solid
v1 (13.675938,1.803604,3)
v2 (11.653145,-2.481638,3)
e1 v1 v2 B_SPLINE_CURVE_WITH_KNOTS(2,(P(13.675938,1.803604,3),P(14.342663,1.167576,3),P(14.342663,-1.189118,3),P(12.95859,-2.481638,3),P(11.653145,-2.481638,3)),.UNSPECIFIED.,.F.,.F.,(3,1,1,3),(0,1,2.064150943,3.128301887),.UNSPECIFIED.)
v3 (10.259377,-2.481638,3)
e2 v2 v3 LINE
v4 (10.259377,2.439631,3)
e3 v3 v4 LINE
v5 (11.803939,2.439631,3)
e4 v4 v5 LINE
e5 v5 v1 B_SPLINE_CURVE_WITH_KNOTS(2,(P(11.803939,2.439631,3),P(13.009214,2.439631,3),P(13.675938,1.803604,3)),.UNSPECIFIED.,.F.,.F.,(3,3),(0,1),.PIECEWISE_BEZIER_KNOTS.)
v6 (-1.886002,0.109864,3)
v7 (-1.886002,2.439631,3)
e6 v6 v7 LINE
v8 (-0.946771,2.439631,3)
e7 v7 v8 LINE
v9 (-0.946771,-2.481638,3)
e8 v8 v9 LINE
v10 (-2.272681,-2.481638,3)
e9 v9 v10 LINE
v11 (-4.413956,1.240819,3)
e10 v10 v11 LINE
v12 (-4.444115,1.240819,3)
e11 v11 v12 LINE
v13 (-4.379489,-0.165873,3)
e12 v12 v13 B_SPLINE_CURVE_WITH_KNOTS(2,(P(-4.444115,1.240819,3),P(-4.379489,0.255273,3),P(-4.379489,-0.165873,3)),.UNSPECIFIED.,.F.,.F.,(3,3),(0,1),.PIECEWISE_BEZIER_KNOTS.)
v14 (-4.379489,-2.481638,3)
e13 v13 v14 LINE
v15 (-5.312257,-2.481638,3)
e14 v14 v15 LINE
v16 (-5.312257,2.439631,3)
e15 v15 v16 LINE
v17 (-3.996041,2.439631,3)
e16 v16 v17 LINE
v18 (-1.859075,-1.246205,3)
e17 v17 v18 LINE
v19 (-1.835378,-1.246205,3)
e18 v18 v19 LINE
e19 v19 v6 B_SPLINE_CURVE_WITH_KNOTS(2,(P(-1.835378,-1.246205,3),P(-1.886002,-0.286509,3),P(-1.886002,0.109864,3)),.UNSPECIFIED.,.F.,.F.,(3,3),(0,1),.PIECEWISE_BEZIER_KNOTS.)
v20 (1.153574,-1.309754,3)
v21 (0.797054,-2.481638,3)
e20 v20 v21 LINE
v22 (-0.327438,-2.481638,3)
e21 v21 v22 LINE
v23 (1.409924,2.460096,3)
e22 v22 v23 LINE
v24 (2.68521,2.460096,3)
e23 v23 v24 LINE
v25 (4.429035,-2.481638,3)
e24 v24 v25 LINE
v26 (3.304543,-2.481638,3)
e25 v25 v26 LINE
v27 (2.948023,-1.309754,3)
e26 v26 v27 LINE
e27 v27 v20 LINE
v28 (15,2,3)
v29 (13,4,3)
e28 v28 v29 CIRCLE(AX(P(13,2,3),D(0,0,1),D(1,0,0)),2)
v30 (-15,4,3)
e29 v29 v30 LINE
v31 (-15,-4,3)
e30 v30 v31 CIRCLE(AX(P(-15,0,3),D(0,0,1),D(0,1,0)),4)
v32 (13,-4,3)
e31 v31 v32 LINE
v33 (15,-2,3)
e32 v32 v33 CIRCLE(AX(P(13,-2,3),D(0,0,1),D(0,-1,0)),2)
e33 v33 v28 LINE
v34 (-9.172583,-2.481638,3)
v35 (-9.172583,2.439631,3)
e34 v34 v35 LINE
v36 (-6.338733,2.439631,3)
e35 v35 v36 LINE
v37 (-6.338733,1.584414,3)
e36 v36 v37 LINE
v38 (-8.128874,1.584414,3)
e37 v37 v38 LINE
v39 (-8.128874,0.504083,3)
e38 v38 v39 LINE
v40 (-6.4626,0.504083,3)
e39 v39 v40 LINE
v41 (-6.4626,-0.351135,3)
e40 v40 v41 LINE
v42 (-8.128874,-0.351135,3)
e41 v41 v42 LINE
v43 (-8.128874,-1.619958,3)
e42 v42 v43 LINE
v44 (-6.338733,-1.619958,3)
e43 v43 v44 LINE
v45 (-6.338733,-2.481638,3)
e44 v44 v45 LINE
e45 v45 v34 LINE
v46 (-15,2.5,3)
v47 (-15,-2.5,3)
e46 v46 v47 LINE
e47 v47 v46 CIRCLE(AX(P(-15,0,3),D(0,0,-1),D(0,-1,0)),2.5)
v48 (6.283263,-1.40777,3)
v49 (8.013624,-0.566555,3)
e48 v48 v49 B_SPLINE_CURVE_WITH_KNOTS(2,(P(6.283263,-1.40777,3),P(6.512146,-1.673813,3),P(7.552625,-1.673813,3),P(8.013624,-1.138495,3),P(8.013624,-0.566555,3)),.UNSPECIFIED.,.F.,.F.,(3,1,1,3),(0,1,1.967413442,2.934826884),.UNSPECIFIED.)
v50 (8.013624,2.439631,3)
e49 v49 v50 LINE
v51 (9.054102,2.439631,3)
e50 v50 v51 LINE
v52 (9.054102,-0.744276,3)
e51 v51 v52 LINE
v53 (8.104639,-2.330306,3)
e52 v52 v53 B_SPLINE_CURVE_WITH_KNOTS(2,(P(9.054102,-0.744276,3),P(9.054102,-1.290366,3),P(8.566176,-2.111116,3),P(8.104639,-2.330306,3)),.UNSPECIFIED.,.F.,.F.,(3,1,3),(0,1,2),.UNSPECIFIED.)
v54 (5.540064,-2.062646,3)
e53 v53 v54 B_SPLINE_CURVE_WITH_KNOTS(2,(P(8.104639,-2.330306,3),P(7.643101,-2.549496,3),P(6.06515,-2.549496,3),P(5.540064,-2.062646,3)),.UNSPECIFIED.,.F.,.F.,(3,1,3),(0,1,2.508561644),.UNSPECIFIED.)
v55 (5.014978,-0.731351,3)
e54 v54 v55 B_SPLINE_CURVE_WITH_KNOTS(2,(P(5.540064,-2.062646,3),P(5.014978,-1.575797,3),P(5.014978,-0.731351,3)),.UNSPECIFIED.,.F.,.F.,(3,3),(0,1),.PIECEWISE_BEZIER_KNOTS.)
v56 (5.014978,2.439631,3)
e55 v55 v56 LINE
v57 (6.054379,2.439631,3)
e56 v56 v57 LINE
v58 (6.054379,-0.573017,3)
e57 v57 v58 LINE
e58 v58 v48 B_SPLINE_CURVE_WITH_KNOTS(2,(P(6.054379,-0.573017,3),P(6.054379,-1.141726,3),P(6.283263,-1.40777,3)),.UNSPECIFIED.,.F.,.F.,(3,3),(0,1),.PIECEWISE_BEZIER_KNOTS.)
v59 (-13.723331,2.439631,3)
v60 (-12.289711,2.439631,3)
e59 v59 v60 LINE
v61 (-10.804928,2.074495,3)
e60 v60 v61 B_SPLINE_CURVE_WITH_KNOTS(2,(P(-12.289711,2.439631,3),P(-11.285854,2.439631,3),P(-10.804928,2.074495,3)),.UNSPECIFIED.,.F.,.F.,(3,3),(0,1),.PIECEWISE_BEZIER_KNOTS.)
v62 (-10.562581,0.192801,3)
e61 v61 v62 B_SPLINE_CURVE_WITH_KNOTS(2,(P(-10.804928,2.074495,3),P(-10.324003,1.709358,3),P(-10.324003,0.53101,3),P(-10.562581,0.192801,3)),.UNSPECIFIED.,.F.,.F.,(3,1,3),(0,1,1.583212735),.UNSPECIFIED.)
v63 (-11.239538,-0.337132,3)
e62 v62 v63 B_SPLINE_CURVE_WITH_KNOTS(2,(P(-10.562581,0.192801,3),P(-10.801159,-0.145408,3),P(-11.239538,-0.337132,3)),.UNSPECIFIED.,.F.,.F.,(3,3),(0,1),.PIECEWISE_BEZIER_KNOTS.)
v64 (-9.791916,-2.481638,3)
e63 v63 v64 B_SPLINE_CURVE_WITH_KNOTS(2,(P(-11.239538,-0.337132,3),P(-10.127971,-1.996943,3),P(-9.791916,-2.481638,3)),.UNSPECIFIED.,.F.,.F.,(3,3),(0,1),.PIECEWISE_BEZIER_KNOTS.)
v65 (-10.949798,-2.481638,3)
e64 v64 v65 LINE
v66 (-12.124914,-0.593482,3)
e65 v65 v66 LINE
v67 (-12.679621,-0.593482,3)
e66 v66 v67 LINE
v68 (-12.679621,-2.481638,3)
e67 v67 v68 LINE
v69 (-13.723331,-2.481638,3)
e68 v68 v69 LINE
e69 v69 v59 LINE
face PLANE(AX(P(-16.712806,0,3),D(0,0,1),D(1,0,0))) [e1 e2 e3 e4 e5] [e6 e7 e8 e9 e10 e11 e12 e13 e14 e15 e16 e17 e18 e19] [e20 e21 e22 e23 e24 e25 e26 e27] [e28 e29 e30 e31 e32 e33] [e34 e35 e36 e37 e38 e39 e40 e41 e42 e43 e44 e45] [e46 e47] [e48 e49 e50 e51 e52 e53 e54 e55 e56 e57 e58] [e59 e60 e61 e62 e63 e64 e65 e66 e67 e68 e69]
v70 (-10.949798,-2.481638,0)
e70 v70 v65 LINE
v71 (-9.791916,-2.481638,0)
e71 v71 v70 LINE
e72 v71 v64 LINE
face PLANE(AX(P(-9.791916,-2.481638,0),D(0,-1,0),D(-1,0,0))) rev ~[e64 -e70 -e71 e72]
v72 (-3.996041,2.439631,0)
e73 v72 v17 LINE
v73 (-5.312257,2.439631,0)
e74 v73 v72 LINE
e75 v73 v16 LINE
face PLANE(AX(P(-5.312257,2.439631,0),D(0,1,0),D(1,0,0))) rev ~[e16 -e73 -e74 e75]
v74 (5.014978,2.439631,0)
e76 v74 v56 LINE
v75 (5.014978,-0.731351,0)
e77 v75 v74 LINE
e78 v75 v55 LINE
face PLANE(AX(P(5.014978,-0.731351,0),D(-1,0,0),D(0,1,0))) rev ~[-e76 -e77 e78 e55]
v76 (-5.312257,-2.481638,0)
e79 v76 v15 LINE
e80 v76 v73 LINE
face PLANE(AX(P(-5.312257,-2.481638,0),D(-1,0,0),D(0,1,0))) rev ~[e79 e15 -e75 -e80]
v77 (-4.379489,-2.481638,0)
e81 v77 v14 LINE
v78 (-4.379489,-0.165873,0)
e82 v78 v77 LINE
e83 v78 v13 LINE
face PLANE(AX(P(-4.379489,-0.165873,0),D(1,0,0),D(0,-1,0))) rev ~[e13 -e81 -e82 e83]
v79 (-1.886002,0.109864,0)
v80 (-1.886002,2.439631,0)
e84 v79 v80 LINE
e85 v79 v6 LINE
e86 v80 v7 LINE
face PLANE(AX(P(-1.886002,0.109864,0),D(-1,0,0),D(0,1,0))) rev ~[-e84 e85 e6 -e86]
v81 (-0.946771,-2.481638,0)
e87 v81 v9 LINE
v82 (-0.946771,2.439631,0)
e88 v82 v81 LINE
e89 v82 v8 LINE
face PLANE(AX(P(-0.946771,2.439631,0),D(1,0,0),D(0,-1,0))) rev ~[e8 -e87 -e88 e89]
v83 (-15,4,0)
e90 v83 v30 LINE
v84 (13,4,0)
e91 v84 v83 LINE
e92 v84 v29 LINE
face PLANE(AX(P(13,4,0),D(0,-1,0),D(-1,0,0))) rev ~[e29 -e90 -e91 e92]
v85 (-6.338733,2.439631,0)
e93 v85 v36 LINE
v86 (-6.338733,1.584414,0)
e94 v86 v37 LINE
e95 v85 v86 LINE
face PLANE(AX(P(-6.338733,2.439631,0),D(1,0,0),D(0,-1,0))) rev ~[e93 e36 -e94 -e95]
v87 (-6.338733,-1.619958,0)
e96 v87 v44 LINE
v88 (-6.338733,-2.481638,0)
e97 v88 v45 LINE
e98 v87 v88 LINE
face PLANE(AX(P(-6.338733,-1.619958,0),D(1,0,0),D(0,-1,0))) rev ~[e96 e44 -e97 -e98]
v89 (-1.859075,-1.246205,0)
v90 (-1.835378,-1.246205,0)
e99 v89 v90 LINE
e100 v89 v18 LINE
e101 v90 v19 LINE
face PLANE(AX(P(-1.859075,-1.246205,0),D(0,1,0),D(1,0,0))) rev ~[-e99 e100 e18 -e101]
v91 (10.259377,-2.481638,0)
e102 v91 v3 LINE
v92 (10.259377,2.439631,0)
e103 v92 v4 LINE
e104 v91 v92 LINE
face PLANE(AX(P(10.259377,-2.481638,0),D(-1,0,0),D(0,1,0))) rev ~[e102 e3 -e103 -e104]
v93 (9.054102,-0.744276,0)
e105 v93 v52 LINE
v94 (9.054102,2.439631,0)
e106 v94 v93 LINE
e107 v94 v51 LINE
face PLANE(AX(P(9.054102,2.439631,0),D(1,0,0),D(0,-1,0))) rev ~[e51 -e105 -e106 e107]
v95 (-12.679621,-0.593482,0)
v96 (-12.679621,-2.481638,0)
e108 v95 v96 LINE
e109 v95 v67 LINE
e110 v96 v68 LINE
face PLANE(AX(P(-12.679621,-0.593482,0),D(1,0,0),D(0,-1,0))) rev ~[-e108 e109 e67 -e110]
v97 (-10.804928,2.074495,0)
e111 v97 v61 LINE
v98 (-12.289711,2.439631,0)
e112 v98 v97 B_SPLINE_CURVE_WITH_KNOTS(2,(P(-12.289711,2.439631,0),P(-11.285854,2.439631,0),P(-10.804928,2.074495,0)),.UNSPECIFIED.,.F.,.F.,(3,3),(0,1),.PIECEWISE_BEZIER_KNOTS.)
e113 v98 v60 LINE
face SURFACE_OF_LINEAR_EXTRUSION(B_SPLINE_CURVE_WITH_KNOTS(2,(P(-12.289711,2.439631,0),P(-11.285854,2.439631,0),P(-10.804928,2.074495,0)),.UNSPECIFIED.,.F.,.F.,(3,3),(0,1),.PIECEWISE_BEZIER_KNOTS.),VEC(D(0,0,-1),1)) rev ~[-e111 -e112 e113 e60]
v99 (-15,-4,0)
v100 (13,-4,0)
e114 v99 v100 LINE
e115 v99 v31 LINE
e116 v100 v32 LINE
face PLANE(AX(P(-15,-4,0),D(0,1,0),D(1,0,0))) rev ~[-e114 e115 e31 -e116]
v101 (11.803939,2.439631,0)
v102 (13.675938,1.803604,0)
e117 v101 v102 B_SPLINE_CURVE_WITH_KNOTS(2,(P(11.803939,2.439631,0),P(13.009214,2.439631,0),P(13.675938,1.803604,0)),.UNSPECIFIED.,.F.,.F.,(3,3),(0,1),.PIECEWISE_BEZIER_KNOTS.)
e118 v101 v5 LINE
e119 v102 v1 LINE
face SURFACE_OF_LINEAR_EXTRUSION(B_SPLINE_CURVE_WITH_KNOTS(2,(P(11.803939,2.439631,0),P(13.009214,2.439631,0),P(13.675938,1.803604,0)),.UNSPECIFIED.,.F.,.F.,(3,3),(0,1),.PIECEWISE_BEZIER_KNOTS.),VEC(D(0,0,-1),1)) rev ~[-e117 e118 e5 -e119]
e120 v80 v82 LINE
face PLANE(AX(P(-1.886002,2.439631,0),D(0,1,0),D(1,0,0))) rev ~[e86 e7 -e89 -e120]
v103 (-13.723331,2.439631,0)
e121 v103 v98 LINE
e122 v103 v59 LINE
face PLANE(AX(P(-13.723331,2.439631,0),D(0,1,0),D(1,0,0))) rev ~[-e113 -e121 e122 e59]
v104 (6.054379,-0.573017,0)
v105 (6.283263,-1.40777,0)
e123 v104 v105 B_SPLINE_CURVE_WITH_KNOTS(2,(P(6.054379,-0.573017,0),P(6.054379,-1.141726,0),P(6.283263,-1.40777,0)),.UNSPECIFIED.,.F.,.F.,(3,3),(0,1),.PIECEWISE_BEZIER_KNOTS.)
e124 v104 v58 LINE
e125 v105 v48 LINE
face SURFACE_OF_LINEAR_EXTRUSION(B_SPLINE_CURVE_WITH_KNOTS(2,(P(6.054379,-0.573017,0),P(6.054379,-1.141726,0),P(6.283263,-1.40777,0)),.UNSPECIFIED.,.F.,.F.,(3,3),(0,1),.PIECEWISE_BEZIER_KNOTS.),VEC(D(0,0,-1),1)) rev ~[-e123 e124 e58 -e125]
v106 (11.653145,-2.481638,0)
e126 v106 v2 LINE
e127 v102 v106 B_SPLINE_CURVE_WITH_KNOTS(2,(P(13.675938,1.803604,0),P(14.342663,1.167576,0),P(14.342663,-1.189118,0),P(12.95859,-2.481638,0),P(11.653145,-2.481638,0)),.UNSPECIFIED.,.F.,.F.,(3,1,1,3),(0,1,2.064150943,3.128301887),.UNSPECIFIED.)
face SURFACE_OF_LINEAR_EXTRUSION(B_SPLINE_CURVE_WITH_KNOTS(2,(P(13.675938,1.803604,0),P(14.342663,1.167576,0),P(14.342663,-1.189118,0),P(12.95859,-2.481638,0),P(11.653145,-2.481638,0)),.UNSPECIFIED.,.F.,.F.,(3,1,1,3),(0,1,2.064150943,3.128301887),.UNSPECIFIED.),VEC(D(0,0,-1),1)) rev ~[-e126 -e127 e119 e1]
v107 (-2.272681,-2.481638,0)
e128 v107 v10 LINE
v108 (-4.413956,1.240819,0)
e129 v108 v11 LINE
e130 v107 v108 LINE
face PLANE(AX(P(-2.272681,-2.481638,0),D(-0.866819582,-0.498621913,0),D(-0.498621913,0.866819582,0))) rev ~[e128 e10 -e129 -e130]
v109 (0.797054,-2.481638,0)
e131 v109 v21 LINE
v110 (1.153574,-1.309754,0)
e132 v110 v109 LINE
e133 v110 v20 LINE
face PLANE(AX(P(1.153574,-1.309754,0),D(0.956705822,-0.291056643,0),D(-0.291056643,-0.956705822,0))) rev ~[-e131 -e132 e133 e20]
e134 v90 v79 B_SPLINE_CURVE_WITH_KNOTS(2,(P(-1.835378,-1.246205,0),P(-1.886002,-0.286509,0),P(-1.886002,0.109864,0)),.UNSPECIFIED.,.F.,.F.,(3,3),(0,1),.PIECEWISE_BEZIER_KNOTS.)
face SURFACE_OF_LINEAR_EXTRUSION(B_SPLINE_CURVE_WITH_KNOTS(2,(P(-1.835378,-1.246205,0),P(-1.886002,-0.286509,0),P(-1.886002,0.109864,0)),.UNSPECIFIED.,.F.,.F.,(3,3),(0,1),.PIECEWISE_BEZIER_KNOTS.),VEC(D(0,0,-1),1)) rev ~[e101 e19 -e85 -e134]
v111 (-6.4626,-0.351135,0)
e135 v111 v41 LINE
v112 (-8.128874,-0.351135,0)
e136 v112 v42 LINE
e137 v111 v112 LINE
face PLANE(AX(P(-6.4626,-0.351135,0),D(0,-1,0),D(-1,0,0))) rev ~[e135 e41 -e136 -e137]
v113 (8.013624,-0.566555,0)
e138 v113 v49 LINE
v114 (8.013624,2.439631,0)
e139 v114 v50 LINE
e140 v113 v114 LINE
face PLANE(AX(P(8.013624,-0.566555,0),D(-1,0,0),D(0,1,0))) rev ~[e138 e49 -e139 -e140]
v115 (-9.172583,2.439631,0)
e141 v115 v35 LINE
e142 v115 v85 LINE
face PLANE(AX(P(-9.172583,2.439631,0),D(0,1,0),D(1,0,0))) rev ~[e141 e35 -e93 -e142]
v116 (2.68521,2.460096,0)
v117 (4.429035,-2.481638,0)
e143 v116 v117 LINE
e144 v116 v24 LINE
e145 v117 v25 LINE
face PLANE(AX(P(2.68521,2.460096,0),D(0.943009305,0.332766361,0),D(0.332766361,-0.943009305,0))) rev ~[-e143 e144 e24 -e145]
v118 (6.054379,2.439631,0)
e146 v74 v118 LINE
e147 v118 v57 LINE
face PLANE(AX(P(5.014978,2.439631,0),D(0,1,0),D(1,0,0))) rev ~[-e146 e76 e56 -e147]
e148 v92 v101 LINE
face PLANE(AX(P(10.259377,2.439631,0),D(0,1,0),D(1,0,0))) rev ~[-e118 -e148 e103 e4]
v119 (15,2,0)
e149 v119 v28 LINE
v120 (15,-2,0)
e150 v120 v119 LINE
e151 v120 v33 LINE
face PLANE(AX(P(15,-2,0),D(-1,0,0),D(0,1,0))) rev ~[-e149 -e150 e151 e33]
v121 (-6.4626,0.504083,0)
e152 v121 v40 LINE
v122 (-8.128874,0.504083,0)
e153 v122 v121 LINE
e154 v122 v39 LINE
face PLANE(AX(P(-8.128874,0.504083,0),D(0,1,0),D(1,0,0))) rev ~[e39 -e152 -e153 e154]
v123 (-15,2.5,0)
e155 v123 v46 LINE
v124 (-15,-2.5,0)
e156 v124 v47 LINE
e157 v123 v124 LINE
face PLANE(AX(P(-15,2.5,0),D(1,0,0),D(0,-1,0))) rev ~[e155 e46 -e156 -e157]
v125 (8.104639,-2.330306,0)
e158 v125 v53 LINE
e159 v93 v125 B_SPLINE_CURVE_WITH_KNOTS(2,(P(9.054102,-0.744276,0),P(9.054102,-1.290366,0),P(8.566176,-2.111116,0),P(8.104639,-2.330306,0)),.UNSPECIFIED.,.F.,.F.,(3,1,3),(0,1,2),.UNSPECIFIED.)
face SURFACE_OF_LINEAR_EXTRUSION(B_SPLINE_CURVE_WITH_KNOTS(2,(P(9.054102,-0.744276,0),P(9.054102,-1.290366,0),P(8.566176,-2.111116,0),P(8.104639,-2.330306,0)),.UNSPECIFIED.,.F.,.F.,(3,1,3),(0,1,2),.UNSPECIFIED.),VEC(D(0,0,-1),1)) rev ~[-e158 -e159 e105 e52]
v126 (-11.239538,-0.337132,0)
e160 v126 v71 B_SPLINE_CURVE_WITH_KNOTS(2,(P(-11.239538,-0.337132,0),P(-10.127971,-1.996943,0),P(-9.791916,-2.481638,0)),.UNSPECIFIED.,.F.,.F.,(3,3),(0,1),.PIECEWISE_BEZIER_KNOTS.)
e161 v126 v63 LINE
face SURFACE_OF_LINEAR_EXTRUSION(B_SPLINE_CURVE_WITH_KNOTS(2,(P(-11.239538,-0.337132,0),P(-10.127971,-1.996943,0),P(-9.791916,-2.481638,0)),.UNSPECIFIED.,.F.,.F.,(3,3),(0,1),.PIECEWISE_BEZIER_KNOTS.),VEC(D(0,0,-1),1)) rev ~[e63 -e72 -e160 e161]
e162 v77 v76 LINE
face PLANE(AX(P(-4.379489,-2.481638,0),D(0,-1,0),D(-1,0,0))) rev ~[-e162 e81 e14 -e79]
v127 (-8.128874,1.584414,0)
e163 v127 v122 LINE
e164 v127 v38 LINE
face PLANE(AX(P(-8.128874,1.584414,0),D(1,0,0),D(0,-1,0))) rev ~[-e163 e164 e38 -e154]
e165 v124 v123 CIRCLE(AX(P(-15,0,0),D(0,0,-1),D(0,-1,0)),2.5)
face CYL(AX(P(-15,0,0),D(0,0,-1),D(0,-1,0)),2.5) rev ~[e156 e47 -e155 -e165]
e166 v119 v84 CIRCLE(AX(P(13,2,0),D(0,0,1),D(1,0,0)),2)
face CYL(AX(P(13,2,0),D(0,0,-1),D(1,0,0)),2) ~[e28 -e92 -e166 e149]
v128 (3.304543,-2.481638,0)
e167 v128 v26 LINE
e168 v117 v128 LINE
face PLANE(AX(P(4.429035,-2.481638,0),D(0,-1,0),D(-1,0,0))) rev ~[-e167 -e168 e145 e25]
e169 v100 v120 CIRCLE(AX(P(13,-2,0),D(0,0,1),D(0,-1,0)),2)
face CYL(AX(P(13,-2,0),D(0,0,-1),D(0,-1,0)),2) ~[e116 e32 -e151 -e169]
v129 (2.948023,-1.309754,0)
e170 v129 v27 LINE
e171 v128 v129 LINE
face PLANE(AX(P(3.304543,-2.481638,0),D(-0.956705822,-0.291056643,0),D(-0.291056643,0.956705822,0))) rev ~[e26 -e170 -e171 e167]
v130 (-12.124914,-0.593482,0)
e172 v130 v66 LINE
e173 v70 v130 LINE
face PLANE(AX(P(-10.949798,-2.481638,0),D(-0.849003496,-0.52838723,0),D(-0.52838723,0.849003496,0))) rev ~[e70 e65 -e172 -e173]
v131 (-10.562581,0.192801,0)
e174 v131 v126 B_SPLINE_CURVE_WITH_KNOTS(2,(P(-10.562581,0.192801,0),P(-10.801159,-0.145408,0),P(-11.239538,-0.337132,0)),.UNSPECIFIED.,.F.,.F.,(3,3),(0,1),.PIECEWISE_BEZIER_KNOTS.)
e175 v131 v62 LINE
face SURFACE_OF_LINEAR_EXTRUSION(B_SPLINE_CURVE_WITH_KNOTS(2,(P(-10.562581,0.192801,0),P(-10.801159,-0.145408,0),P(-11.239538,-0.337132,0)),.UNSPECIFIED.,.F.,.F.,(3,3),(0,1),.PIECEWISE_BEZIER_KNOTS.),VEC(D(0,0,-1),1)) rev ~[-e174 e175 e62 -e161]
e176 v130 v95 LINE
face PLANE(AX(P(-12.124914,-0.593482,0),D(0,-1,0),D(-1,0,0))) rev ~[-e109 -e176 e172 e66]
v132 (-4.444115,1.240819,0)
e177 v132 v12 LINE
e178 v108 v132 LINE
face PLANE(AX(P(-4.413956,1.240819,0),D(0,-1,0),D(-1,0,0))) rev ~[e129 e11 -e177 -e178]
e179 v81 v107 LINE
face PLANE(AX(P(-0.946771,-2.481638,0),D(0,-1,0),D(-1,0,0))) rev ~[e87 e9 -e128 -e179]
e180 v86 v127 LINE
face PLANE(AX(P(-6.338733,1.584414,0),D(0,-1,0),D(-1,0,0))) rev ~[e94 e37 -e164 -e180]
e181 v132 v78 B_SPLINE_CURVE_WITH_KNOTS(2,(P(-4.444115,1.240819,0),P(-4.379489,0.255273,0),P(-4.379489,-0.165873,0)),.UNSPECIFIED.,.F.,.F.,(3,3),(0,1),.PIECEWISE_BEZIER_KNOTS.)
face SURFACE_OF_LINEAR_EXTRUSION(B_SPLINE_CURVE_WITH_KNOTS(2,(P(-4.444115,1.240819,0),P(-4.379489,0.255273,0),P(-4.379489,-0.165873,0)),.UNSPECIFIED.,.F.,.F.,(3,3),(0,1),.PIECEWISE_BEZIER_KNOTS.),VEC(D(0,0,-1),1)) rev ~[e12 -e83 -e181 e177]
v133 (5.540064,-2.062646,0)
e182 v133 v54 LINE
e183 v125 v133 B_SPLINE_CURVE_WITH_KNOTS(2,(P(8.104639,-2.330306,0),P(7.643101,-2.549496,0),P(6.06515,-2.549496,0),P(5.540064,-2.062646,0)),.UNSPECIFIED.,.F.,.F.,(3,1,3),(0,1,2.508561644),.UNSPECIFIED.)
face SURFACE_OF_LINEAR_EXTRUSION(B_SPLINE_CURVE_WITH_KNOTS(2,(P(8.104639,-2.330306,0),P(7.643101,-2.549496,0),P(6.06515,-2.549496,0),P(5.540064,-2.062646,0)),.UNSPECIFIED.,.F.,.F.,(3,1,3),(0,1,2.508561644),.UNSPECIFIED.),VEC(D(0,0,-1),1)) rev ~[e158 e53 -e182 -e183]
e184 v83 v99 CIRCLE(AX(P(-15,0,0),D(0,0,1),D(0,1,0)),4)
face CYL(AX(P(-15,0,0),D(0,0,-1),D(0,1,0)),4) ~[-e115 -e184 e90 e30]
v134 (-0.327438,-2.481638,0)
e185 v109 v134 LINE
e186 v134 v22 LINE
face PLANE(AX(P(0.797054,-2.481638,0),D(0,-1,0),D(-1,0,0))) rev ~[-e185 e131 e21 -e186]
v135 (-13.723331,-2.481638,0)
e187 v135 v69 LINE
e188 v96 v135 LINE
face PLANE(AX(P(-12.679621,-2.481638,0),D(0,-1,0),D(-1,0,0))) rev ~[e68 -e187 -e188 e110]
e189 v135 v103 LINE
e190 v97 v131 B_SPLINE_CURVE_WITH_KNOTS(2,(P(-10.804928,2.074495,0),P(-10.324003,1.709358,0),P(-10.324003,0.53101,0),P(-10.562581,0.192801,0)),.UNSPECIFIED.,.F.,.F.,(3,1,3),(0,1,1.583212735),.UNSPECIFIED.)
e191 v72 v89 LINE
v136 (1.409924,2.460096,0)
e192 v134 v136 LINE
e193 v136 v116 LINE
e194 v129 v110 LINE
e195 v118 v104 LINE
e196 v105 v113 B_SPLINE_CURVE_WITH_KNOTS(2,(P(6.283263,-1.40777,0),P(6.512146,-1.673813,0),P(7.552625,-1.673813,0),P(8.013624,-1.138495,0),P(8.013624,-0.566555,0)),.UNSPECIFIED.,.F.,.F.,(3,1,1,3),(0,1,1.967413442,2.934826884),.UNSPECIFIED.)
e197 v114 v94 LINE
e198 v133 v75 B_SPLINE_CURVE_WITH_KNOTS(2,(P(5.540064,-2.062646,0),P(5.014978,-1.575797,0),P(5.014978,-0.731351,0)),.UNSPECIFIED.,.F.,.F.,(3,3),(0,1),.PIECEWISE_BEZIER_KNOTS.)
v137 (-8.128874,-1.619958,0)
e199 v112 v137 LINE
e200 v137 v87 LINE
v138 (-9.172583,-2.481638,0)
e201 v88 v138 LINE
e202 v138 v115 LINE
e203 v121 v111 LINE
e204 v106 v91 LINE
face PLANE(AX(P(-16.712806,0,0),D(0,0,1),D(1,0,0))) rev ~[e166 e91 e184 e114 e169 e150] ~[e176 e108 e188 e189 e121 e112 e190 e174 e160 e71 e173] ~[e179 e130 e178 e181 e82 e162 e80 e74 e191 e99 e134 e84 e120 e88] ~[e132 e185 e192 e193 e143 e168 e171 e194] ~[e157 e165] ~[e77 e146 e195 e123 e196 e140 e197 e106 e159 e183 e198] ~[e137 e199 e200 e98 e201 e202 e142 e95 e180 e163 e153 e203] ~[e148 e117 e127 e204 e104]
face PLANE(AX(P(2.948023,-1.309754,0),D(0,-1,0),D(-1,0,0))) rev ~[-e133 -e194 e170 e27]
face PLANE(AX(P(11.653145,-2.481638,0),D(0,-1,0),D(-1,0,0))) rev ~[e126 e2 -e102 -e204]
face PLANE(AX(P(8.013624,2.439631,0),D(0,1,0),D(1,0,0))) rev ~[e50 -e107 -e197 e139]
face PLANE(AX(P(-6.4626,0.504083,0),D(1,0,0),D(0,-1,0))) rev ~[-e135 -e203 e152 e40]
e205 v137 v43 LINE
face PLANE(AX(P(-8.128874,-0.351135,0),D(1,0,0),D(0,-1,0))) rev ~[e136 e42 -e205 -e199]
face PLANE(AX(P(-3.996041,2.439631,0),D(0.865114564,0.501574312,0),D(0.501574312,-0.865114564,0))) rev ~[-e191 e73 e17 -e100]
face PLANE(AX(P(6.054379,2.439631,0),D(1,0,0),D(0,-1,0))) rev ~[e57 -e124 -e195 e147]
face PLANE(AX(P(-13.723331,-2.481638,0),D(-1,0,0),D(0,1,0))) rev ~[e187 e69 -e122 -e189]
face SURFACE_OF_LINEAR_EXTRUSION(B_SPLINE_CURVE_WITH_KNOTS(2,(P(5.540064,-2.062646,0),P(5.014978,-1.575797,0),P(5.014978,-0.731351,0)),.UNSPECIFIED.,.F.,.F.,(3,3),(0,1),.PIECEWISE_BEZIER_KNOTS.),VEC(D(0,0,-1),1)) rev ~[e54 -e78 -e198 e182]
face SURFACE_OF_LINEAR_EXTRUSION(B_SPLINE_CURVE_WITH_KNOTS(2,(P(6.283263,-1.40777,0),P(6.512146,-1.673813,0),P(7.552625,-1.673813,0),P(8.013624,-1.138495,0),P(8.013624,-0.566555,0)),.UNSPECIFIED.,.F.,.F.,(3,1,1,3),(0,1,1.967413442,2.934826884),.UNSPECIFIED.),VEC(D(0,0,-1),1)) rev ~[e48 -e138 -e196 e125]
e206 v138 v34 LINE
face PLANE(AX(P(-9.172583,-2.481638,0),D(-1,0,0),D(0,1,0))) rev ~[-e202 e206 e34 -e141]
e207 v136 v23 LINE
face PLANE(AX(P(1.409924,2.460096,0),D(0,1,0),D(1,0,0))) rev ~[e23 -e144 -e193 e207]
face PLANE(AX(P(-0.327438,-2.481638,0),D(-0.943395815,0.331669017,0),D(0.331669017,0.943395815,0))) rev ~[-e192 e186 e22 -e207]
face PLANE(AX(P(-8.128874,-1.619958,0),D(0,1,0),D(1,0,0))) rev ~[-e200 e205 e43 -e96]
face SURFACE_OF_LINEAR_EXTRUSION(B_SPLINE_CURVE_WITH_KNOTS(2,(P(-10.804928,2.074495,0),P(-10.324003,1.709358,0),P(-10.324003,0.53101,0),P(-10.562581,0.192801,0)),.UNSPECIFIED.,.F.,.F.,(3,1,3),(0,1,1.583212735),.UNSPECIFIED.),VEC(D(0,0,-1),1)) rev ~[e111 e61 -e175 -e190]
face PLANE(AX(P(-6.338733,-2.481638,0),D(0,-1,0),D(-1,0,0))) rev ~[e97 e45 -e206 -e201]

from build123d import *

# Parameters (mm, degrees)
F1_DEPTH = 3


# Not quite as in the source:
# - a feature names something its author has since deleted; it is built from what else it names


with BuildPart() as f1:
    # F0 (on Top) → F1 (new body)
    with BuildSketch(Plane.XY):
        with BuildLine():
            Line((-15, 2.5), (-15, 4))
            ThreePointArc((-15, 4), (-19, 0), (-15, -4))
            Line((-15, -4), (-15, -2.5))
            ThreePointArc((-15, -2.5), (-17.5, 0), (-15, 2.5))
        make_face()
        with BuildLine():
            Line((13, 4), (-15, 4))
            Line((-15, 4), (-15, 2.5))
            Line((-15, 2.5), (-15, -2.5))
            Line((-15, -2.5), (-15, -4))
            Line((-15, -4), (13, -4))
            ThreePointArc((13, -4), (14.4142135624, -3.4142135624), (15, -2))
            Line((15, -2), (15, 2))
            ThreePointArc((15, 2), (14.4142135624, 3.4142135624), (13, 4))
        make_face()
        with BuildLine():
            Line((-12.1249144637, -0.5934820884), (-12.6796209529, -0.5934820884))
            Line((-12.6796209529, -0.5934820884), (-12.6796209529, -2.4816383516))
            Line((-12.6796209529, -2.4816383516), (-13.7233308326, -2.4816383516))
            Line((-13.7233308326, -2.4816383516), (-13.7233308326, 2.4396314525))
            Line((-13.7233308326, 2.4396314525), (-12.2897107605, 2.4396314525))
            add(Edge.make_bspline(
                [(-12.2897107605, 2.4396314525), (-11.2858535801, 2.4396314525), (-10.8049284394, 2.0744945596)],
                knots=[0, 0, 0, 1, 1, 1], degree=2))
            add(Edge.make_bspline(
                [(-10.8049284394, 2.0744945596), (-10.3240032988, 1.7093576667), (-10.3240032988, 0.9650815812)],
                knots=[0, 0, 0, 1, 1, 1], degree=2))
            add(Edge.make_bspline(
                [(-10.3240032988, 0.9650815812), (-10.3240032988, 0.5310102897), (-10.5625809441, 0.1928008962)],
                knots=[0, 0, 0, 1, 1, 1], degree=2))
            add(Edge.make_bspline(
                [(-10.5625809441, 0.1928008962), (-10.8011585895, -0.1454084972), (-11.239538281, -0.3371322934)],
                knots=[0, 0, 0, 1, 1, 1], degree=2))
            add(Edge.make_bspline(
                [(-11.239538281, -0.3371322934), (-10.1279711026, -1.9969433611), (-9.7919159092, -2.4816383516)],
                knots=[0, 0, 0, 1, 1, 1], degree=2))
            Line((-9.7919159092, -2.4816383516), (-10.9497983866, -2.4816383516))
            Line((-10.9497983866, -2.4816383516), (-12.1249144637, -0.5934820884))
        make_face(mode=Mode.SUBTRACT)
        Polygon((-6.3387333765, -1.6199583684), (-6.3387333765, -2.4816383516), (-9.1725834212, -2.4816383516), (-9.1725834212, 2.4396314525), (-6.3387333765, 2.4396314525), (-6.3387333765, 1.5844140691), (-8.1288735416, 1.5844140691), (-8.1288735416, 0.5040827902), (-6.4625998741, 0.5040827902), (-6.4625998741, -0.3511345932), (-8.1288735416, -0.3511345932), (-8.1288735416, -1.6199583684), align=None, mode=Mode.SUBTRACT)
        with BuildLine():
            Line((-0.9467708815, 2.4396314525), (-0.9467708815, -2.4816383516))
            Line((-0.9467708815, -2.4816383516), (-2.2726809557, -2.4816383516))
            Line((-2.2726809557, -2.4816383516), (-4.413955714, 1.2408191758))
            Line((-4.413955714, 1.2408191758), (-4.4441145134, 1.2408191758))
            add(Edge.make_bspline(
                [(-4.4441145134, 1.2408191758), (-4.3794885146, 0.255272695), (-4.3794885146, -0.1658733968)],
                knots=[0, 0, 0, 1, 1, 1], degree=2))
            Line((-4.3794885146, -0.1658733968), (-4.3794885146, -2.4816383516))
            Line((-4.3794885146, -2.4816383516), (-5.3122570965, -2.4816383516))
            Line((-5.3122570965, -2.4816383516), (-5.3122570965, 2.4396314525))
            Line((-5.3122570965, 2.4396314525), (-3.9960409221, 2.4396314525))
            Line((-3.9960409221, 2.4396314525), (-1.8590745638, -1.2462046757))
            Line((-1.8590745638, -1.2462046757), (-1.8353783642, -1.2462046757))
            add(Edge.make_bspline(
                [(-1.8353783642, -1.2462046757), (-1.8860020632, -0.2865085944), (-1.8860020632, 0.1098641979)],
                knots=[0, 0, 0, 1, 1, 1], degree=2))
            Line((-1.8860020632, 0.1098641979), (-1.8860020632, 2.4396314525))
            Line((-1.8860020632, 2.4396314525), (-0.9467708815, 2.4396314525))
        make_face(mode=Mode.SUBTRACT)
        Polygon((4.4290351137, -2.4816383516), (3.3045427356, -2.4816383516), (2.9480226425, -1.3097535745), (1.1535740775, -1.3097535745), (0.7970539845, -2.4816383516), (-0.3274383936, -2.4816383516), (1.4099238725, 2.4600963521), (2.6852102477, 2.4600963521), align=None, mode=Mode.SUBTRACT)
        with BuildLine():
            Line((8.0136238438, 2.4396314525), (9.0541024235, 2.4396314525))
            Line((9.0541024235, 2.4396314525), (9.0541024235, -0.7442760855))
            add(Edge.make_bspline(
                [(9.0541024235, -0.7442760855), (9.0541024235, -1.2903657749), (8.8101392783, -1.7007408669)],
                knots=[0, 0, 0, 1, 1, 1], degree=2))
            add(Edge.make_bspline(
                [(8.8101392783, -1.7007408669), (8.5661761331, -2.1111159589), (8.1046387921, -2.3303058046)],
                knots=[0, 0, 0, 1, 1, 1], degree=2))
            add(Edge.make_bspline(
                [(8.1046387921, -2.3303058046), (7.643101451, -2.5494956503), (7.0140750633, -2.5494956503)],
                knots=[0, 0, 0, 1, 1, 1], degree=2))
            add(Edge.make_bspline(
                [(7.0140750633, -2.5494956503), (6.0651499818, -2.5494956503), (5.540063742, -2.0626464598)],
                knots=[0, 0, 0, 1, 1, 1], degree=2))
            add(Edge.make_bspline(
                [(5.540063742, -2.0626464598), (5.0149775023, -1.5757972693), (5.0149775023, -0.7313508857)],
                knots=[0, 0, 0, 1, 1, 1], degree=2))
            Line((5.0149775023, -0.7313508857), (5.0149775023, 2.4396314525))
            Line((5.0149775023, 2.4396314525), (6.054378982, 2.4396314525))
            Line((6.054378982, 2.4396314525), (6.054378982, -0.5730171888))
            add(Edge.make_bspline(
                [(6.054378982, -0.5730171888), (6.054378982, -1.1417259777), (6.2832627275, -1.4077696726)],
                knots=[0, 0, 0, 1, 1, 1], degree=2))
            add(Edge.make_bspline(
                [(6.2832627275, -1.4077696726), (6.5121464731, -1.6738133674), (7.0410025628, -1.6738133674)],
                knots=[0, 0, 0, 1, 1, 1], degree=2))
            add(Edge.make_bspline(
                [(7.0410025628, -1.6738133674), (7.5526250528, -1.6738133674), (7.7831244483, -1.4061540226)],
                knots=[0, 0, 0, 1, 1, 1], degree=2))
            add(Edge.make_bspline(
                [(7.7831244483, -1.4061540226), (8.0136238438, -1.1384946778), (8.0136238438, -0.566554589)],
                knots=[0, 0, 0, 1, 1, 1], degree=2))
            Line((8.0136238438, -0.566554589), (8.0136238438, 2.4396314525))
        make_face(mode=Mode.SUBTRACT)
        with BuildLine():
            add(Edge.make_bspline(
                [(13.6759384335, 1.8036039149), (14.3426633205, 1.1675763772), (14.3426633205, 0.0258503995)],
                knots=[0, 0, 0, 1, 1, 1], degree=2))
            add(Edge.make_bspline(
                [(14.3426633205, 0.0258503995), (14.3426633205, -1.1891183768), (13.650626584, -1.8353783642)],
                knots=[0, 0, 0, 1, 1, 1], degree=2))
            add(Edge.make_bspline(
                [(13.650626584, -1.8353783642), (12.9585898475, -2.4816383516), (11.6531446729, -2.4816383516)],
                knots=[0, 0, 0, 1, 1, 1], degree=2))
            Line((11.6531446729, -2.4816383516), (10.2593773001, -2.4816383516))
            Line((10.2593773001, -2.4816383516), (10.2593773001, 2.4396314525))
            Line((10.2593773001, 2.4396314525), (11.80393867, 2.4396314525))
            add(Edge.make_bspline(
                [(11.80393867, 2.4396314525), (13.0092135465, 2.4396314525), (13.6759384335, 1.8036039149)],
                knots=[0, 0, 0, 1, 1, 1], degree=2))
        make_face(mode=Mode.SUBTRACT)
    extrude(amount=F1_DEPTH)


solid = f1.part
